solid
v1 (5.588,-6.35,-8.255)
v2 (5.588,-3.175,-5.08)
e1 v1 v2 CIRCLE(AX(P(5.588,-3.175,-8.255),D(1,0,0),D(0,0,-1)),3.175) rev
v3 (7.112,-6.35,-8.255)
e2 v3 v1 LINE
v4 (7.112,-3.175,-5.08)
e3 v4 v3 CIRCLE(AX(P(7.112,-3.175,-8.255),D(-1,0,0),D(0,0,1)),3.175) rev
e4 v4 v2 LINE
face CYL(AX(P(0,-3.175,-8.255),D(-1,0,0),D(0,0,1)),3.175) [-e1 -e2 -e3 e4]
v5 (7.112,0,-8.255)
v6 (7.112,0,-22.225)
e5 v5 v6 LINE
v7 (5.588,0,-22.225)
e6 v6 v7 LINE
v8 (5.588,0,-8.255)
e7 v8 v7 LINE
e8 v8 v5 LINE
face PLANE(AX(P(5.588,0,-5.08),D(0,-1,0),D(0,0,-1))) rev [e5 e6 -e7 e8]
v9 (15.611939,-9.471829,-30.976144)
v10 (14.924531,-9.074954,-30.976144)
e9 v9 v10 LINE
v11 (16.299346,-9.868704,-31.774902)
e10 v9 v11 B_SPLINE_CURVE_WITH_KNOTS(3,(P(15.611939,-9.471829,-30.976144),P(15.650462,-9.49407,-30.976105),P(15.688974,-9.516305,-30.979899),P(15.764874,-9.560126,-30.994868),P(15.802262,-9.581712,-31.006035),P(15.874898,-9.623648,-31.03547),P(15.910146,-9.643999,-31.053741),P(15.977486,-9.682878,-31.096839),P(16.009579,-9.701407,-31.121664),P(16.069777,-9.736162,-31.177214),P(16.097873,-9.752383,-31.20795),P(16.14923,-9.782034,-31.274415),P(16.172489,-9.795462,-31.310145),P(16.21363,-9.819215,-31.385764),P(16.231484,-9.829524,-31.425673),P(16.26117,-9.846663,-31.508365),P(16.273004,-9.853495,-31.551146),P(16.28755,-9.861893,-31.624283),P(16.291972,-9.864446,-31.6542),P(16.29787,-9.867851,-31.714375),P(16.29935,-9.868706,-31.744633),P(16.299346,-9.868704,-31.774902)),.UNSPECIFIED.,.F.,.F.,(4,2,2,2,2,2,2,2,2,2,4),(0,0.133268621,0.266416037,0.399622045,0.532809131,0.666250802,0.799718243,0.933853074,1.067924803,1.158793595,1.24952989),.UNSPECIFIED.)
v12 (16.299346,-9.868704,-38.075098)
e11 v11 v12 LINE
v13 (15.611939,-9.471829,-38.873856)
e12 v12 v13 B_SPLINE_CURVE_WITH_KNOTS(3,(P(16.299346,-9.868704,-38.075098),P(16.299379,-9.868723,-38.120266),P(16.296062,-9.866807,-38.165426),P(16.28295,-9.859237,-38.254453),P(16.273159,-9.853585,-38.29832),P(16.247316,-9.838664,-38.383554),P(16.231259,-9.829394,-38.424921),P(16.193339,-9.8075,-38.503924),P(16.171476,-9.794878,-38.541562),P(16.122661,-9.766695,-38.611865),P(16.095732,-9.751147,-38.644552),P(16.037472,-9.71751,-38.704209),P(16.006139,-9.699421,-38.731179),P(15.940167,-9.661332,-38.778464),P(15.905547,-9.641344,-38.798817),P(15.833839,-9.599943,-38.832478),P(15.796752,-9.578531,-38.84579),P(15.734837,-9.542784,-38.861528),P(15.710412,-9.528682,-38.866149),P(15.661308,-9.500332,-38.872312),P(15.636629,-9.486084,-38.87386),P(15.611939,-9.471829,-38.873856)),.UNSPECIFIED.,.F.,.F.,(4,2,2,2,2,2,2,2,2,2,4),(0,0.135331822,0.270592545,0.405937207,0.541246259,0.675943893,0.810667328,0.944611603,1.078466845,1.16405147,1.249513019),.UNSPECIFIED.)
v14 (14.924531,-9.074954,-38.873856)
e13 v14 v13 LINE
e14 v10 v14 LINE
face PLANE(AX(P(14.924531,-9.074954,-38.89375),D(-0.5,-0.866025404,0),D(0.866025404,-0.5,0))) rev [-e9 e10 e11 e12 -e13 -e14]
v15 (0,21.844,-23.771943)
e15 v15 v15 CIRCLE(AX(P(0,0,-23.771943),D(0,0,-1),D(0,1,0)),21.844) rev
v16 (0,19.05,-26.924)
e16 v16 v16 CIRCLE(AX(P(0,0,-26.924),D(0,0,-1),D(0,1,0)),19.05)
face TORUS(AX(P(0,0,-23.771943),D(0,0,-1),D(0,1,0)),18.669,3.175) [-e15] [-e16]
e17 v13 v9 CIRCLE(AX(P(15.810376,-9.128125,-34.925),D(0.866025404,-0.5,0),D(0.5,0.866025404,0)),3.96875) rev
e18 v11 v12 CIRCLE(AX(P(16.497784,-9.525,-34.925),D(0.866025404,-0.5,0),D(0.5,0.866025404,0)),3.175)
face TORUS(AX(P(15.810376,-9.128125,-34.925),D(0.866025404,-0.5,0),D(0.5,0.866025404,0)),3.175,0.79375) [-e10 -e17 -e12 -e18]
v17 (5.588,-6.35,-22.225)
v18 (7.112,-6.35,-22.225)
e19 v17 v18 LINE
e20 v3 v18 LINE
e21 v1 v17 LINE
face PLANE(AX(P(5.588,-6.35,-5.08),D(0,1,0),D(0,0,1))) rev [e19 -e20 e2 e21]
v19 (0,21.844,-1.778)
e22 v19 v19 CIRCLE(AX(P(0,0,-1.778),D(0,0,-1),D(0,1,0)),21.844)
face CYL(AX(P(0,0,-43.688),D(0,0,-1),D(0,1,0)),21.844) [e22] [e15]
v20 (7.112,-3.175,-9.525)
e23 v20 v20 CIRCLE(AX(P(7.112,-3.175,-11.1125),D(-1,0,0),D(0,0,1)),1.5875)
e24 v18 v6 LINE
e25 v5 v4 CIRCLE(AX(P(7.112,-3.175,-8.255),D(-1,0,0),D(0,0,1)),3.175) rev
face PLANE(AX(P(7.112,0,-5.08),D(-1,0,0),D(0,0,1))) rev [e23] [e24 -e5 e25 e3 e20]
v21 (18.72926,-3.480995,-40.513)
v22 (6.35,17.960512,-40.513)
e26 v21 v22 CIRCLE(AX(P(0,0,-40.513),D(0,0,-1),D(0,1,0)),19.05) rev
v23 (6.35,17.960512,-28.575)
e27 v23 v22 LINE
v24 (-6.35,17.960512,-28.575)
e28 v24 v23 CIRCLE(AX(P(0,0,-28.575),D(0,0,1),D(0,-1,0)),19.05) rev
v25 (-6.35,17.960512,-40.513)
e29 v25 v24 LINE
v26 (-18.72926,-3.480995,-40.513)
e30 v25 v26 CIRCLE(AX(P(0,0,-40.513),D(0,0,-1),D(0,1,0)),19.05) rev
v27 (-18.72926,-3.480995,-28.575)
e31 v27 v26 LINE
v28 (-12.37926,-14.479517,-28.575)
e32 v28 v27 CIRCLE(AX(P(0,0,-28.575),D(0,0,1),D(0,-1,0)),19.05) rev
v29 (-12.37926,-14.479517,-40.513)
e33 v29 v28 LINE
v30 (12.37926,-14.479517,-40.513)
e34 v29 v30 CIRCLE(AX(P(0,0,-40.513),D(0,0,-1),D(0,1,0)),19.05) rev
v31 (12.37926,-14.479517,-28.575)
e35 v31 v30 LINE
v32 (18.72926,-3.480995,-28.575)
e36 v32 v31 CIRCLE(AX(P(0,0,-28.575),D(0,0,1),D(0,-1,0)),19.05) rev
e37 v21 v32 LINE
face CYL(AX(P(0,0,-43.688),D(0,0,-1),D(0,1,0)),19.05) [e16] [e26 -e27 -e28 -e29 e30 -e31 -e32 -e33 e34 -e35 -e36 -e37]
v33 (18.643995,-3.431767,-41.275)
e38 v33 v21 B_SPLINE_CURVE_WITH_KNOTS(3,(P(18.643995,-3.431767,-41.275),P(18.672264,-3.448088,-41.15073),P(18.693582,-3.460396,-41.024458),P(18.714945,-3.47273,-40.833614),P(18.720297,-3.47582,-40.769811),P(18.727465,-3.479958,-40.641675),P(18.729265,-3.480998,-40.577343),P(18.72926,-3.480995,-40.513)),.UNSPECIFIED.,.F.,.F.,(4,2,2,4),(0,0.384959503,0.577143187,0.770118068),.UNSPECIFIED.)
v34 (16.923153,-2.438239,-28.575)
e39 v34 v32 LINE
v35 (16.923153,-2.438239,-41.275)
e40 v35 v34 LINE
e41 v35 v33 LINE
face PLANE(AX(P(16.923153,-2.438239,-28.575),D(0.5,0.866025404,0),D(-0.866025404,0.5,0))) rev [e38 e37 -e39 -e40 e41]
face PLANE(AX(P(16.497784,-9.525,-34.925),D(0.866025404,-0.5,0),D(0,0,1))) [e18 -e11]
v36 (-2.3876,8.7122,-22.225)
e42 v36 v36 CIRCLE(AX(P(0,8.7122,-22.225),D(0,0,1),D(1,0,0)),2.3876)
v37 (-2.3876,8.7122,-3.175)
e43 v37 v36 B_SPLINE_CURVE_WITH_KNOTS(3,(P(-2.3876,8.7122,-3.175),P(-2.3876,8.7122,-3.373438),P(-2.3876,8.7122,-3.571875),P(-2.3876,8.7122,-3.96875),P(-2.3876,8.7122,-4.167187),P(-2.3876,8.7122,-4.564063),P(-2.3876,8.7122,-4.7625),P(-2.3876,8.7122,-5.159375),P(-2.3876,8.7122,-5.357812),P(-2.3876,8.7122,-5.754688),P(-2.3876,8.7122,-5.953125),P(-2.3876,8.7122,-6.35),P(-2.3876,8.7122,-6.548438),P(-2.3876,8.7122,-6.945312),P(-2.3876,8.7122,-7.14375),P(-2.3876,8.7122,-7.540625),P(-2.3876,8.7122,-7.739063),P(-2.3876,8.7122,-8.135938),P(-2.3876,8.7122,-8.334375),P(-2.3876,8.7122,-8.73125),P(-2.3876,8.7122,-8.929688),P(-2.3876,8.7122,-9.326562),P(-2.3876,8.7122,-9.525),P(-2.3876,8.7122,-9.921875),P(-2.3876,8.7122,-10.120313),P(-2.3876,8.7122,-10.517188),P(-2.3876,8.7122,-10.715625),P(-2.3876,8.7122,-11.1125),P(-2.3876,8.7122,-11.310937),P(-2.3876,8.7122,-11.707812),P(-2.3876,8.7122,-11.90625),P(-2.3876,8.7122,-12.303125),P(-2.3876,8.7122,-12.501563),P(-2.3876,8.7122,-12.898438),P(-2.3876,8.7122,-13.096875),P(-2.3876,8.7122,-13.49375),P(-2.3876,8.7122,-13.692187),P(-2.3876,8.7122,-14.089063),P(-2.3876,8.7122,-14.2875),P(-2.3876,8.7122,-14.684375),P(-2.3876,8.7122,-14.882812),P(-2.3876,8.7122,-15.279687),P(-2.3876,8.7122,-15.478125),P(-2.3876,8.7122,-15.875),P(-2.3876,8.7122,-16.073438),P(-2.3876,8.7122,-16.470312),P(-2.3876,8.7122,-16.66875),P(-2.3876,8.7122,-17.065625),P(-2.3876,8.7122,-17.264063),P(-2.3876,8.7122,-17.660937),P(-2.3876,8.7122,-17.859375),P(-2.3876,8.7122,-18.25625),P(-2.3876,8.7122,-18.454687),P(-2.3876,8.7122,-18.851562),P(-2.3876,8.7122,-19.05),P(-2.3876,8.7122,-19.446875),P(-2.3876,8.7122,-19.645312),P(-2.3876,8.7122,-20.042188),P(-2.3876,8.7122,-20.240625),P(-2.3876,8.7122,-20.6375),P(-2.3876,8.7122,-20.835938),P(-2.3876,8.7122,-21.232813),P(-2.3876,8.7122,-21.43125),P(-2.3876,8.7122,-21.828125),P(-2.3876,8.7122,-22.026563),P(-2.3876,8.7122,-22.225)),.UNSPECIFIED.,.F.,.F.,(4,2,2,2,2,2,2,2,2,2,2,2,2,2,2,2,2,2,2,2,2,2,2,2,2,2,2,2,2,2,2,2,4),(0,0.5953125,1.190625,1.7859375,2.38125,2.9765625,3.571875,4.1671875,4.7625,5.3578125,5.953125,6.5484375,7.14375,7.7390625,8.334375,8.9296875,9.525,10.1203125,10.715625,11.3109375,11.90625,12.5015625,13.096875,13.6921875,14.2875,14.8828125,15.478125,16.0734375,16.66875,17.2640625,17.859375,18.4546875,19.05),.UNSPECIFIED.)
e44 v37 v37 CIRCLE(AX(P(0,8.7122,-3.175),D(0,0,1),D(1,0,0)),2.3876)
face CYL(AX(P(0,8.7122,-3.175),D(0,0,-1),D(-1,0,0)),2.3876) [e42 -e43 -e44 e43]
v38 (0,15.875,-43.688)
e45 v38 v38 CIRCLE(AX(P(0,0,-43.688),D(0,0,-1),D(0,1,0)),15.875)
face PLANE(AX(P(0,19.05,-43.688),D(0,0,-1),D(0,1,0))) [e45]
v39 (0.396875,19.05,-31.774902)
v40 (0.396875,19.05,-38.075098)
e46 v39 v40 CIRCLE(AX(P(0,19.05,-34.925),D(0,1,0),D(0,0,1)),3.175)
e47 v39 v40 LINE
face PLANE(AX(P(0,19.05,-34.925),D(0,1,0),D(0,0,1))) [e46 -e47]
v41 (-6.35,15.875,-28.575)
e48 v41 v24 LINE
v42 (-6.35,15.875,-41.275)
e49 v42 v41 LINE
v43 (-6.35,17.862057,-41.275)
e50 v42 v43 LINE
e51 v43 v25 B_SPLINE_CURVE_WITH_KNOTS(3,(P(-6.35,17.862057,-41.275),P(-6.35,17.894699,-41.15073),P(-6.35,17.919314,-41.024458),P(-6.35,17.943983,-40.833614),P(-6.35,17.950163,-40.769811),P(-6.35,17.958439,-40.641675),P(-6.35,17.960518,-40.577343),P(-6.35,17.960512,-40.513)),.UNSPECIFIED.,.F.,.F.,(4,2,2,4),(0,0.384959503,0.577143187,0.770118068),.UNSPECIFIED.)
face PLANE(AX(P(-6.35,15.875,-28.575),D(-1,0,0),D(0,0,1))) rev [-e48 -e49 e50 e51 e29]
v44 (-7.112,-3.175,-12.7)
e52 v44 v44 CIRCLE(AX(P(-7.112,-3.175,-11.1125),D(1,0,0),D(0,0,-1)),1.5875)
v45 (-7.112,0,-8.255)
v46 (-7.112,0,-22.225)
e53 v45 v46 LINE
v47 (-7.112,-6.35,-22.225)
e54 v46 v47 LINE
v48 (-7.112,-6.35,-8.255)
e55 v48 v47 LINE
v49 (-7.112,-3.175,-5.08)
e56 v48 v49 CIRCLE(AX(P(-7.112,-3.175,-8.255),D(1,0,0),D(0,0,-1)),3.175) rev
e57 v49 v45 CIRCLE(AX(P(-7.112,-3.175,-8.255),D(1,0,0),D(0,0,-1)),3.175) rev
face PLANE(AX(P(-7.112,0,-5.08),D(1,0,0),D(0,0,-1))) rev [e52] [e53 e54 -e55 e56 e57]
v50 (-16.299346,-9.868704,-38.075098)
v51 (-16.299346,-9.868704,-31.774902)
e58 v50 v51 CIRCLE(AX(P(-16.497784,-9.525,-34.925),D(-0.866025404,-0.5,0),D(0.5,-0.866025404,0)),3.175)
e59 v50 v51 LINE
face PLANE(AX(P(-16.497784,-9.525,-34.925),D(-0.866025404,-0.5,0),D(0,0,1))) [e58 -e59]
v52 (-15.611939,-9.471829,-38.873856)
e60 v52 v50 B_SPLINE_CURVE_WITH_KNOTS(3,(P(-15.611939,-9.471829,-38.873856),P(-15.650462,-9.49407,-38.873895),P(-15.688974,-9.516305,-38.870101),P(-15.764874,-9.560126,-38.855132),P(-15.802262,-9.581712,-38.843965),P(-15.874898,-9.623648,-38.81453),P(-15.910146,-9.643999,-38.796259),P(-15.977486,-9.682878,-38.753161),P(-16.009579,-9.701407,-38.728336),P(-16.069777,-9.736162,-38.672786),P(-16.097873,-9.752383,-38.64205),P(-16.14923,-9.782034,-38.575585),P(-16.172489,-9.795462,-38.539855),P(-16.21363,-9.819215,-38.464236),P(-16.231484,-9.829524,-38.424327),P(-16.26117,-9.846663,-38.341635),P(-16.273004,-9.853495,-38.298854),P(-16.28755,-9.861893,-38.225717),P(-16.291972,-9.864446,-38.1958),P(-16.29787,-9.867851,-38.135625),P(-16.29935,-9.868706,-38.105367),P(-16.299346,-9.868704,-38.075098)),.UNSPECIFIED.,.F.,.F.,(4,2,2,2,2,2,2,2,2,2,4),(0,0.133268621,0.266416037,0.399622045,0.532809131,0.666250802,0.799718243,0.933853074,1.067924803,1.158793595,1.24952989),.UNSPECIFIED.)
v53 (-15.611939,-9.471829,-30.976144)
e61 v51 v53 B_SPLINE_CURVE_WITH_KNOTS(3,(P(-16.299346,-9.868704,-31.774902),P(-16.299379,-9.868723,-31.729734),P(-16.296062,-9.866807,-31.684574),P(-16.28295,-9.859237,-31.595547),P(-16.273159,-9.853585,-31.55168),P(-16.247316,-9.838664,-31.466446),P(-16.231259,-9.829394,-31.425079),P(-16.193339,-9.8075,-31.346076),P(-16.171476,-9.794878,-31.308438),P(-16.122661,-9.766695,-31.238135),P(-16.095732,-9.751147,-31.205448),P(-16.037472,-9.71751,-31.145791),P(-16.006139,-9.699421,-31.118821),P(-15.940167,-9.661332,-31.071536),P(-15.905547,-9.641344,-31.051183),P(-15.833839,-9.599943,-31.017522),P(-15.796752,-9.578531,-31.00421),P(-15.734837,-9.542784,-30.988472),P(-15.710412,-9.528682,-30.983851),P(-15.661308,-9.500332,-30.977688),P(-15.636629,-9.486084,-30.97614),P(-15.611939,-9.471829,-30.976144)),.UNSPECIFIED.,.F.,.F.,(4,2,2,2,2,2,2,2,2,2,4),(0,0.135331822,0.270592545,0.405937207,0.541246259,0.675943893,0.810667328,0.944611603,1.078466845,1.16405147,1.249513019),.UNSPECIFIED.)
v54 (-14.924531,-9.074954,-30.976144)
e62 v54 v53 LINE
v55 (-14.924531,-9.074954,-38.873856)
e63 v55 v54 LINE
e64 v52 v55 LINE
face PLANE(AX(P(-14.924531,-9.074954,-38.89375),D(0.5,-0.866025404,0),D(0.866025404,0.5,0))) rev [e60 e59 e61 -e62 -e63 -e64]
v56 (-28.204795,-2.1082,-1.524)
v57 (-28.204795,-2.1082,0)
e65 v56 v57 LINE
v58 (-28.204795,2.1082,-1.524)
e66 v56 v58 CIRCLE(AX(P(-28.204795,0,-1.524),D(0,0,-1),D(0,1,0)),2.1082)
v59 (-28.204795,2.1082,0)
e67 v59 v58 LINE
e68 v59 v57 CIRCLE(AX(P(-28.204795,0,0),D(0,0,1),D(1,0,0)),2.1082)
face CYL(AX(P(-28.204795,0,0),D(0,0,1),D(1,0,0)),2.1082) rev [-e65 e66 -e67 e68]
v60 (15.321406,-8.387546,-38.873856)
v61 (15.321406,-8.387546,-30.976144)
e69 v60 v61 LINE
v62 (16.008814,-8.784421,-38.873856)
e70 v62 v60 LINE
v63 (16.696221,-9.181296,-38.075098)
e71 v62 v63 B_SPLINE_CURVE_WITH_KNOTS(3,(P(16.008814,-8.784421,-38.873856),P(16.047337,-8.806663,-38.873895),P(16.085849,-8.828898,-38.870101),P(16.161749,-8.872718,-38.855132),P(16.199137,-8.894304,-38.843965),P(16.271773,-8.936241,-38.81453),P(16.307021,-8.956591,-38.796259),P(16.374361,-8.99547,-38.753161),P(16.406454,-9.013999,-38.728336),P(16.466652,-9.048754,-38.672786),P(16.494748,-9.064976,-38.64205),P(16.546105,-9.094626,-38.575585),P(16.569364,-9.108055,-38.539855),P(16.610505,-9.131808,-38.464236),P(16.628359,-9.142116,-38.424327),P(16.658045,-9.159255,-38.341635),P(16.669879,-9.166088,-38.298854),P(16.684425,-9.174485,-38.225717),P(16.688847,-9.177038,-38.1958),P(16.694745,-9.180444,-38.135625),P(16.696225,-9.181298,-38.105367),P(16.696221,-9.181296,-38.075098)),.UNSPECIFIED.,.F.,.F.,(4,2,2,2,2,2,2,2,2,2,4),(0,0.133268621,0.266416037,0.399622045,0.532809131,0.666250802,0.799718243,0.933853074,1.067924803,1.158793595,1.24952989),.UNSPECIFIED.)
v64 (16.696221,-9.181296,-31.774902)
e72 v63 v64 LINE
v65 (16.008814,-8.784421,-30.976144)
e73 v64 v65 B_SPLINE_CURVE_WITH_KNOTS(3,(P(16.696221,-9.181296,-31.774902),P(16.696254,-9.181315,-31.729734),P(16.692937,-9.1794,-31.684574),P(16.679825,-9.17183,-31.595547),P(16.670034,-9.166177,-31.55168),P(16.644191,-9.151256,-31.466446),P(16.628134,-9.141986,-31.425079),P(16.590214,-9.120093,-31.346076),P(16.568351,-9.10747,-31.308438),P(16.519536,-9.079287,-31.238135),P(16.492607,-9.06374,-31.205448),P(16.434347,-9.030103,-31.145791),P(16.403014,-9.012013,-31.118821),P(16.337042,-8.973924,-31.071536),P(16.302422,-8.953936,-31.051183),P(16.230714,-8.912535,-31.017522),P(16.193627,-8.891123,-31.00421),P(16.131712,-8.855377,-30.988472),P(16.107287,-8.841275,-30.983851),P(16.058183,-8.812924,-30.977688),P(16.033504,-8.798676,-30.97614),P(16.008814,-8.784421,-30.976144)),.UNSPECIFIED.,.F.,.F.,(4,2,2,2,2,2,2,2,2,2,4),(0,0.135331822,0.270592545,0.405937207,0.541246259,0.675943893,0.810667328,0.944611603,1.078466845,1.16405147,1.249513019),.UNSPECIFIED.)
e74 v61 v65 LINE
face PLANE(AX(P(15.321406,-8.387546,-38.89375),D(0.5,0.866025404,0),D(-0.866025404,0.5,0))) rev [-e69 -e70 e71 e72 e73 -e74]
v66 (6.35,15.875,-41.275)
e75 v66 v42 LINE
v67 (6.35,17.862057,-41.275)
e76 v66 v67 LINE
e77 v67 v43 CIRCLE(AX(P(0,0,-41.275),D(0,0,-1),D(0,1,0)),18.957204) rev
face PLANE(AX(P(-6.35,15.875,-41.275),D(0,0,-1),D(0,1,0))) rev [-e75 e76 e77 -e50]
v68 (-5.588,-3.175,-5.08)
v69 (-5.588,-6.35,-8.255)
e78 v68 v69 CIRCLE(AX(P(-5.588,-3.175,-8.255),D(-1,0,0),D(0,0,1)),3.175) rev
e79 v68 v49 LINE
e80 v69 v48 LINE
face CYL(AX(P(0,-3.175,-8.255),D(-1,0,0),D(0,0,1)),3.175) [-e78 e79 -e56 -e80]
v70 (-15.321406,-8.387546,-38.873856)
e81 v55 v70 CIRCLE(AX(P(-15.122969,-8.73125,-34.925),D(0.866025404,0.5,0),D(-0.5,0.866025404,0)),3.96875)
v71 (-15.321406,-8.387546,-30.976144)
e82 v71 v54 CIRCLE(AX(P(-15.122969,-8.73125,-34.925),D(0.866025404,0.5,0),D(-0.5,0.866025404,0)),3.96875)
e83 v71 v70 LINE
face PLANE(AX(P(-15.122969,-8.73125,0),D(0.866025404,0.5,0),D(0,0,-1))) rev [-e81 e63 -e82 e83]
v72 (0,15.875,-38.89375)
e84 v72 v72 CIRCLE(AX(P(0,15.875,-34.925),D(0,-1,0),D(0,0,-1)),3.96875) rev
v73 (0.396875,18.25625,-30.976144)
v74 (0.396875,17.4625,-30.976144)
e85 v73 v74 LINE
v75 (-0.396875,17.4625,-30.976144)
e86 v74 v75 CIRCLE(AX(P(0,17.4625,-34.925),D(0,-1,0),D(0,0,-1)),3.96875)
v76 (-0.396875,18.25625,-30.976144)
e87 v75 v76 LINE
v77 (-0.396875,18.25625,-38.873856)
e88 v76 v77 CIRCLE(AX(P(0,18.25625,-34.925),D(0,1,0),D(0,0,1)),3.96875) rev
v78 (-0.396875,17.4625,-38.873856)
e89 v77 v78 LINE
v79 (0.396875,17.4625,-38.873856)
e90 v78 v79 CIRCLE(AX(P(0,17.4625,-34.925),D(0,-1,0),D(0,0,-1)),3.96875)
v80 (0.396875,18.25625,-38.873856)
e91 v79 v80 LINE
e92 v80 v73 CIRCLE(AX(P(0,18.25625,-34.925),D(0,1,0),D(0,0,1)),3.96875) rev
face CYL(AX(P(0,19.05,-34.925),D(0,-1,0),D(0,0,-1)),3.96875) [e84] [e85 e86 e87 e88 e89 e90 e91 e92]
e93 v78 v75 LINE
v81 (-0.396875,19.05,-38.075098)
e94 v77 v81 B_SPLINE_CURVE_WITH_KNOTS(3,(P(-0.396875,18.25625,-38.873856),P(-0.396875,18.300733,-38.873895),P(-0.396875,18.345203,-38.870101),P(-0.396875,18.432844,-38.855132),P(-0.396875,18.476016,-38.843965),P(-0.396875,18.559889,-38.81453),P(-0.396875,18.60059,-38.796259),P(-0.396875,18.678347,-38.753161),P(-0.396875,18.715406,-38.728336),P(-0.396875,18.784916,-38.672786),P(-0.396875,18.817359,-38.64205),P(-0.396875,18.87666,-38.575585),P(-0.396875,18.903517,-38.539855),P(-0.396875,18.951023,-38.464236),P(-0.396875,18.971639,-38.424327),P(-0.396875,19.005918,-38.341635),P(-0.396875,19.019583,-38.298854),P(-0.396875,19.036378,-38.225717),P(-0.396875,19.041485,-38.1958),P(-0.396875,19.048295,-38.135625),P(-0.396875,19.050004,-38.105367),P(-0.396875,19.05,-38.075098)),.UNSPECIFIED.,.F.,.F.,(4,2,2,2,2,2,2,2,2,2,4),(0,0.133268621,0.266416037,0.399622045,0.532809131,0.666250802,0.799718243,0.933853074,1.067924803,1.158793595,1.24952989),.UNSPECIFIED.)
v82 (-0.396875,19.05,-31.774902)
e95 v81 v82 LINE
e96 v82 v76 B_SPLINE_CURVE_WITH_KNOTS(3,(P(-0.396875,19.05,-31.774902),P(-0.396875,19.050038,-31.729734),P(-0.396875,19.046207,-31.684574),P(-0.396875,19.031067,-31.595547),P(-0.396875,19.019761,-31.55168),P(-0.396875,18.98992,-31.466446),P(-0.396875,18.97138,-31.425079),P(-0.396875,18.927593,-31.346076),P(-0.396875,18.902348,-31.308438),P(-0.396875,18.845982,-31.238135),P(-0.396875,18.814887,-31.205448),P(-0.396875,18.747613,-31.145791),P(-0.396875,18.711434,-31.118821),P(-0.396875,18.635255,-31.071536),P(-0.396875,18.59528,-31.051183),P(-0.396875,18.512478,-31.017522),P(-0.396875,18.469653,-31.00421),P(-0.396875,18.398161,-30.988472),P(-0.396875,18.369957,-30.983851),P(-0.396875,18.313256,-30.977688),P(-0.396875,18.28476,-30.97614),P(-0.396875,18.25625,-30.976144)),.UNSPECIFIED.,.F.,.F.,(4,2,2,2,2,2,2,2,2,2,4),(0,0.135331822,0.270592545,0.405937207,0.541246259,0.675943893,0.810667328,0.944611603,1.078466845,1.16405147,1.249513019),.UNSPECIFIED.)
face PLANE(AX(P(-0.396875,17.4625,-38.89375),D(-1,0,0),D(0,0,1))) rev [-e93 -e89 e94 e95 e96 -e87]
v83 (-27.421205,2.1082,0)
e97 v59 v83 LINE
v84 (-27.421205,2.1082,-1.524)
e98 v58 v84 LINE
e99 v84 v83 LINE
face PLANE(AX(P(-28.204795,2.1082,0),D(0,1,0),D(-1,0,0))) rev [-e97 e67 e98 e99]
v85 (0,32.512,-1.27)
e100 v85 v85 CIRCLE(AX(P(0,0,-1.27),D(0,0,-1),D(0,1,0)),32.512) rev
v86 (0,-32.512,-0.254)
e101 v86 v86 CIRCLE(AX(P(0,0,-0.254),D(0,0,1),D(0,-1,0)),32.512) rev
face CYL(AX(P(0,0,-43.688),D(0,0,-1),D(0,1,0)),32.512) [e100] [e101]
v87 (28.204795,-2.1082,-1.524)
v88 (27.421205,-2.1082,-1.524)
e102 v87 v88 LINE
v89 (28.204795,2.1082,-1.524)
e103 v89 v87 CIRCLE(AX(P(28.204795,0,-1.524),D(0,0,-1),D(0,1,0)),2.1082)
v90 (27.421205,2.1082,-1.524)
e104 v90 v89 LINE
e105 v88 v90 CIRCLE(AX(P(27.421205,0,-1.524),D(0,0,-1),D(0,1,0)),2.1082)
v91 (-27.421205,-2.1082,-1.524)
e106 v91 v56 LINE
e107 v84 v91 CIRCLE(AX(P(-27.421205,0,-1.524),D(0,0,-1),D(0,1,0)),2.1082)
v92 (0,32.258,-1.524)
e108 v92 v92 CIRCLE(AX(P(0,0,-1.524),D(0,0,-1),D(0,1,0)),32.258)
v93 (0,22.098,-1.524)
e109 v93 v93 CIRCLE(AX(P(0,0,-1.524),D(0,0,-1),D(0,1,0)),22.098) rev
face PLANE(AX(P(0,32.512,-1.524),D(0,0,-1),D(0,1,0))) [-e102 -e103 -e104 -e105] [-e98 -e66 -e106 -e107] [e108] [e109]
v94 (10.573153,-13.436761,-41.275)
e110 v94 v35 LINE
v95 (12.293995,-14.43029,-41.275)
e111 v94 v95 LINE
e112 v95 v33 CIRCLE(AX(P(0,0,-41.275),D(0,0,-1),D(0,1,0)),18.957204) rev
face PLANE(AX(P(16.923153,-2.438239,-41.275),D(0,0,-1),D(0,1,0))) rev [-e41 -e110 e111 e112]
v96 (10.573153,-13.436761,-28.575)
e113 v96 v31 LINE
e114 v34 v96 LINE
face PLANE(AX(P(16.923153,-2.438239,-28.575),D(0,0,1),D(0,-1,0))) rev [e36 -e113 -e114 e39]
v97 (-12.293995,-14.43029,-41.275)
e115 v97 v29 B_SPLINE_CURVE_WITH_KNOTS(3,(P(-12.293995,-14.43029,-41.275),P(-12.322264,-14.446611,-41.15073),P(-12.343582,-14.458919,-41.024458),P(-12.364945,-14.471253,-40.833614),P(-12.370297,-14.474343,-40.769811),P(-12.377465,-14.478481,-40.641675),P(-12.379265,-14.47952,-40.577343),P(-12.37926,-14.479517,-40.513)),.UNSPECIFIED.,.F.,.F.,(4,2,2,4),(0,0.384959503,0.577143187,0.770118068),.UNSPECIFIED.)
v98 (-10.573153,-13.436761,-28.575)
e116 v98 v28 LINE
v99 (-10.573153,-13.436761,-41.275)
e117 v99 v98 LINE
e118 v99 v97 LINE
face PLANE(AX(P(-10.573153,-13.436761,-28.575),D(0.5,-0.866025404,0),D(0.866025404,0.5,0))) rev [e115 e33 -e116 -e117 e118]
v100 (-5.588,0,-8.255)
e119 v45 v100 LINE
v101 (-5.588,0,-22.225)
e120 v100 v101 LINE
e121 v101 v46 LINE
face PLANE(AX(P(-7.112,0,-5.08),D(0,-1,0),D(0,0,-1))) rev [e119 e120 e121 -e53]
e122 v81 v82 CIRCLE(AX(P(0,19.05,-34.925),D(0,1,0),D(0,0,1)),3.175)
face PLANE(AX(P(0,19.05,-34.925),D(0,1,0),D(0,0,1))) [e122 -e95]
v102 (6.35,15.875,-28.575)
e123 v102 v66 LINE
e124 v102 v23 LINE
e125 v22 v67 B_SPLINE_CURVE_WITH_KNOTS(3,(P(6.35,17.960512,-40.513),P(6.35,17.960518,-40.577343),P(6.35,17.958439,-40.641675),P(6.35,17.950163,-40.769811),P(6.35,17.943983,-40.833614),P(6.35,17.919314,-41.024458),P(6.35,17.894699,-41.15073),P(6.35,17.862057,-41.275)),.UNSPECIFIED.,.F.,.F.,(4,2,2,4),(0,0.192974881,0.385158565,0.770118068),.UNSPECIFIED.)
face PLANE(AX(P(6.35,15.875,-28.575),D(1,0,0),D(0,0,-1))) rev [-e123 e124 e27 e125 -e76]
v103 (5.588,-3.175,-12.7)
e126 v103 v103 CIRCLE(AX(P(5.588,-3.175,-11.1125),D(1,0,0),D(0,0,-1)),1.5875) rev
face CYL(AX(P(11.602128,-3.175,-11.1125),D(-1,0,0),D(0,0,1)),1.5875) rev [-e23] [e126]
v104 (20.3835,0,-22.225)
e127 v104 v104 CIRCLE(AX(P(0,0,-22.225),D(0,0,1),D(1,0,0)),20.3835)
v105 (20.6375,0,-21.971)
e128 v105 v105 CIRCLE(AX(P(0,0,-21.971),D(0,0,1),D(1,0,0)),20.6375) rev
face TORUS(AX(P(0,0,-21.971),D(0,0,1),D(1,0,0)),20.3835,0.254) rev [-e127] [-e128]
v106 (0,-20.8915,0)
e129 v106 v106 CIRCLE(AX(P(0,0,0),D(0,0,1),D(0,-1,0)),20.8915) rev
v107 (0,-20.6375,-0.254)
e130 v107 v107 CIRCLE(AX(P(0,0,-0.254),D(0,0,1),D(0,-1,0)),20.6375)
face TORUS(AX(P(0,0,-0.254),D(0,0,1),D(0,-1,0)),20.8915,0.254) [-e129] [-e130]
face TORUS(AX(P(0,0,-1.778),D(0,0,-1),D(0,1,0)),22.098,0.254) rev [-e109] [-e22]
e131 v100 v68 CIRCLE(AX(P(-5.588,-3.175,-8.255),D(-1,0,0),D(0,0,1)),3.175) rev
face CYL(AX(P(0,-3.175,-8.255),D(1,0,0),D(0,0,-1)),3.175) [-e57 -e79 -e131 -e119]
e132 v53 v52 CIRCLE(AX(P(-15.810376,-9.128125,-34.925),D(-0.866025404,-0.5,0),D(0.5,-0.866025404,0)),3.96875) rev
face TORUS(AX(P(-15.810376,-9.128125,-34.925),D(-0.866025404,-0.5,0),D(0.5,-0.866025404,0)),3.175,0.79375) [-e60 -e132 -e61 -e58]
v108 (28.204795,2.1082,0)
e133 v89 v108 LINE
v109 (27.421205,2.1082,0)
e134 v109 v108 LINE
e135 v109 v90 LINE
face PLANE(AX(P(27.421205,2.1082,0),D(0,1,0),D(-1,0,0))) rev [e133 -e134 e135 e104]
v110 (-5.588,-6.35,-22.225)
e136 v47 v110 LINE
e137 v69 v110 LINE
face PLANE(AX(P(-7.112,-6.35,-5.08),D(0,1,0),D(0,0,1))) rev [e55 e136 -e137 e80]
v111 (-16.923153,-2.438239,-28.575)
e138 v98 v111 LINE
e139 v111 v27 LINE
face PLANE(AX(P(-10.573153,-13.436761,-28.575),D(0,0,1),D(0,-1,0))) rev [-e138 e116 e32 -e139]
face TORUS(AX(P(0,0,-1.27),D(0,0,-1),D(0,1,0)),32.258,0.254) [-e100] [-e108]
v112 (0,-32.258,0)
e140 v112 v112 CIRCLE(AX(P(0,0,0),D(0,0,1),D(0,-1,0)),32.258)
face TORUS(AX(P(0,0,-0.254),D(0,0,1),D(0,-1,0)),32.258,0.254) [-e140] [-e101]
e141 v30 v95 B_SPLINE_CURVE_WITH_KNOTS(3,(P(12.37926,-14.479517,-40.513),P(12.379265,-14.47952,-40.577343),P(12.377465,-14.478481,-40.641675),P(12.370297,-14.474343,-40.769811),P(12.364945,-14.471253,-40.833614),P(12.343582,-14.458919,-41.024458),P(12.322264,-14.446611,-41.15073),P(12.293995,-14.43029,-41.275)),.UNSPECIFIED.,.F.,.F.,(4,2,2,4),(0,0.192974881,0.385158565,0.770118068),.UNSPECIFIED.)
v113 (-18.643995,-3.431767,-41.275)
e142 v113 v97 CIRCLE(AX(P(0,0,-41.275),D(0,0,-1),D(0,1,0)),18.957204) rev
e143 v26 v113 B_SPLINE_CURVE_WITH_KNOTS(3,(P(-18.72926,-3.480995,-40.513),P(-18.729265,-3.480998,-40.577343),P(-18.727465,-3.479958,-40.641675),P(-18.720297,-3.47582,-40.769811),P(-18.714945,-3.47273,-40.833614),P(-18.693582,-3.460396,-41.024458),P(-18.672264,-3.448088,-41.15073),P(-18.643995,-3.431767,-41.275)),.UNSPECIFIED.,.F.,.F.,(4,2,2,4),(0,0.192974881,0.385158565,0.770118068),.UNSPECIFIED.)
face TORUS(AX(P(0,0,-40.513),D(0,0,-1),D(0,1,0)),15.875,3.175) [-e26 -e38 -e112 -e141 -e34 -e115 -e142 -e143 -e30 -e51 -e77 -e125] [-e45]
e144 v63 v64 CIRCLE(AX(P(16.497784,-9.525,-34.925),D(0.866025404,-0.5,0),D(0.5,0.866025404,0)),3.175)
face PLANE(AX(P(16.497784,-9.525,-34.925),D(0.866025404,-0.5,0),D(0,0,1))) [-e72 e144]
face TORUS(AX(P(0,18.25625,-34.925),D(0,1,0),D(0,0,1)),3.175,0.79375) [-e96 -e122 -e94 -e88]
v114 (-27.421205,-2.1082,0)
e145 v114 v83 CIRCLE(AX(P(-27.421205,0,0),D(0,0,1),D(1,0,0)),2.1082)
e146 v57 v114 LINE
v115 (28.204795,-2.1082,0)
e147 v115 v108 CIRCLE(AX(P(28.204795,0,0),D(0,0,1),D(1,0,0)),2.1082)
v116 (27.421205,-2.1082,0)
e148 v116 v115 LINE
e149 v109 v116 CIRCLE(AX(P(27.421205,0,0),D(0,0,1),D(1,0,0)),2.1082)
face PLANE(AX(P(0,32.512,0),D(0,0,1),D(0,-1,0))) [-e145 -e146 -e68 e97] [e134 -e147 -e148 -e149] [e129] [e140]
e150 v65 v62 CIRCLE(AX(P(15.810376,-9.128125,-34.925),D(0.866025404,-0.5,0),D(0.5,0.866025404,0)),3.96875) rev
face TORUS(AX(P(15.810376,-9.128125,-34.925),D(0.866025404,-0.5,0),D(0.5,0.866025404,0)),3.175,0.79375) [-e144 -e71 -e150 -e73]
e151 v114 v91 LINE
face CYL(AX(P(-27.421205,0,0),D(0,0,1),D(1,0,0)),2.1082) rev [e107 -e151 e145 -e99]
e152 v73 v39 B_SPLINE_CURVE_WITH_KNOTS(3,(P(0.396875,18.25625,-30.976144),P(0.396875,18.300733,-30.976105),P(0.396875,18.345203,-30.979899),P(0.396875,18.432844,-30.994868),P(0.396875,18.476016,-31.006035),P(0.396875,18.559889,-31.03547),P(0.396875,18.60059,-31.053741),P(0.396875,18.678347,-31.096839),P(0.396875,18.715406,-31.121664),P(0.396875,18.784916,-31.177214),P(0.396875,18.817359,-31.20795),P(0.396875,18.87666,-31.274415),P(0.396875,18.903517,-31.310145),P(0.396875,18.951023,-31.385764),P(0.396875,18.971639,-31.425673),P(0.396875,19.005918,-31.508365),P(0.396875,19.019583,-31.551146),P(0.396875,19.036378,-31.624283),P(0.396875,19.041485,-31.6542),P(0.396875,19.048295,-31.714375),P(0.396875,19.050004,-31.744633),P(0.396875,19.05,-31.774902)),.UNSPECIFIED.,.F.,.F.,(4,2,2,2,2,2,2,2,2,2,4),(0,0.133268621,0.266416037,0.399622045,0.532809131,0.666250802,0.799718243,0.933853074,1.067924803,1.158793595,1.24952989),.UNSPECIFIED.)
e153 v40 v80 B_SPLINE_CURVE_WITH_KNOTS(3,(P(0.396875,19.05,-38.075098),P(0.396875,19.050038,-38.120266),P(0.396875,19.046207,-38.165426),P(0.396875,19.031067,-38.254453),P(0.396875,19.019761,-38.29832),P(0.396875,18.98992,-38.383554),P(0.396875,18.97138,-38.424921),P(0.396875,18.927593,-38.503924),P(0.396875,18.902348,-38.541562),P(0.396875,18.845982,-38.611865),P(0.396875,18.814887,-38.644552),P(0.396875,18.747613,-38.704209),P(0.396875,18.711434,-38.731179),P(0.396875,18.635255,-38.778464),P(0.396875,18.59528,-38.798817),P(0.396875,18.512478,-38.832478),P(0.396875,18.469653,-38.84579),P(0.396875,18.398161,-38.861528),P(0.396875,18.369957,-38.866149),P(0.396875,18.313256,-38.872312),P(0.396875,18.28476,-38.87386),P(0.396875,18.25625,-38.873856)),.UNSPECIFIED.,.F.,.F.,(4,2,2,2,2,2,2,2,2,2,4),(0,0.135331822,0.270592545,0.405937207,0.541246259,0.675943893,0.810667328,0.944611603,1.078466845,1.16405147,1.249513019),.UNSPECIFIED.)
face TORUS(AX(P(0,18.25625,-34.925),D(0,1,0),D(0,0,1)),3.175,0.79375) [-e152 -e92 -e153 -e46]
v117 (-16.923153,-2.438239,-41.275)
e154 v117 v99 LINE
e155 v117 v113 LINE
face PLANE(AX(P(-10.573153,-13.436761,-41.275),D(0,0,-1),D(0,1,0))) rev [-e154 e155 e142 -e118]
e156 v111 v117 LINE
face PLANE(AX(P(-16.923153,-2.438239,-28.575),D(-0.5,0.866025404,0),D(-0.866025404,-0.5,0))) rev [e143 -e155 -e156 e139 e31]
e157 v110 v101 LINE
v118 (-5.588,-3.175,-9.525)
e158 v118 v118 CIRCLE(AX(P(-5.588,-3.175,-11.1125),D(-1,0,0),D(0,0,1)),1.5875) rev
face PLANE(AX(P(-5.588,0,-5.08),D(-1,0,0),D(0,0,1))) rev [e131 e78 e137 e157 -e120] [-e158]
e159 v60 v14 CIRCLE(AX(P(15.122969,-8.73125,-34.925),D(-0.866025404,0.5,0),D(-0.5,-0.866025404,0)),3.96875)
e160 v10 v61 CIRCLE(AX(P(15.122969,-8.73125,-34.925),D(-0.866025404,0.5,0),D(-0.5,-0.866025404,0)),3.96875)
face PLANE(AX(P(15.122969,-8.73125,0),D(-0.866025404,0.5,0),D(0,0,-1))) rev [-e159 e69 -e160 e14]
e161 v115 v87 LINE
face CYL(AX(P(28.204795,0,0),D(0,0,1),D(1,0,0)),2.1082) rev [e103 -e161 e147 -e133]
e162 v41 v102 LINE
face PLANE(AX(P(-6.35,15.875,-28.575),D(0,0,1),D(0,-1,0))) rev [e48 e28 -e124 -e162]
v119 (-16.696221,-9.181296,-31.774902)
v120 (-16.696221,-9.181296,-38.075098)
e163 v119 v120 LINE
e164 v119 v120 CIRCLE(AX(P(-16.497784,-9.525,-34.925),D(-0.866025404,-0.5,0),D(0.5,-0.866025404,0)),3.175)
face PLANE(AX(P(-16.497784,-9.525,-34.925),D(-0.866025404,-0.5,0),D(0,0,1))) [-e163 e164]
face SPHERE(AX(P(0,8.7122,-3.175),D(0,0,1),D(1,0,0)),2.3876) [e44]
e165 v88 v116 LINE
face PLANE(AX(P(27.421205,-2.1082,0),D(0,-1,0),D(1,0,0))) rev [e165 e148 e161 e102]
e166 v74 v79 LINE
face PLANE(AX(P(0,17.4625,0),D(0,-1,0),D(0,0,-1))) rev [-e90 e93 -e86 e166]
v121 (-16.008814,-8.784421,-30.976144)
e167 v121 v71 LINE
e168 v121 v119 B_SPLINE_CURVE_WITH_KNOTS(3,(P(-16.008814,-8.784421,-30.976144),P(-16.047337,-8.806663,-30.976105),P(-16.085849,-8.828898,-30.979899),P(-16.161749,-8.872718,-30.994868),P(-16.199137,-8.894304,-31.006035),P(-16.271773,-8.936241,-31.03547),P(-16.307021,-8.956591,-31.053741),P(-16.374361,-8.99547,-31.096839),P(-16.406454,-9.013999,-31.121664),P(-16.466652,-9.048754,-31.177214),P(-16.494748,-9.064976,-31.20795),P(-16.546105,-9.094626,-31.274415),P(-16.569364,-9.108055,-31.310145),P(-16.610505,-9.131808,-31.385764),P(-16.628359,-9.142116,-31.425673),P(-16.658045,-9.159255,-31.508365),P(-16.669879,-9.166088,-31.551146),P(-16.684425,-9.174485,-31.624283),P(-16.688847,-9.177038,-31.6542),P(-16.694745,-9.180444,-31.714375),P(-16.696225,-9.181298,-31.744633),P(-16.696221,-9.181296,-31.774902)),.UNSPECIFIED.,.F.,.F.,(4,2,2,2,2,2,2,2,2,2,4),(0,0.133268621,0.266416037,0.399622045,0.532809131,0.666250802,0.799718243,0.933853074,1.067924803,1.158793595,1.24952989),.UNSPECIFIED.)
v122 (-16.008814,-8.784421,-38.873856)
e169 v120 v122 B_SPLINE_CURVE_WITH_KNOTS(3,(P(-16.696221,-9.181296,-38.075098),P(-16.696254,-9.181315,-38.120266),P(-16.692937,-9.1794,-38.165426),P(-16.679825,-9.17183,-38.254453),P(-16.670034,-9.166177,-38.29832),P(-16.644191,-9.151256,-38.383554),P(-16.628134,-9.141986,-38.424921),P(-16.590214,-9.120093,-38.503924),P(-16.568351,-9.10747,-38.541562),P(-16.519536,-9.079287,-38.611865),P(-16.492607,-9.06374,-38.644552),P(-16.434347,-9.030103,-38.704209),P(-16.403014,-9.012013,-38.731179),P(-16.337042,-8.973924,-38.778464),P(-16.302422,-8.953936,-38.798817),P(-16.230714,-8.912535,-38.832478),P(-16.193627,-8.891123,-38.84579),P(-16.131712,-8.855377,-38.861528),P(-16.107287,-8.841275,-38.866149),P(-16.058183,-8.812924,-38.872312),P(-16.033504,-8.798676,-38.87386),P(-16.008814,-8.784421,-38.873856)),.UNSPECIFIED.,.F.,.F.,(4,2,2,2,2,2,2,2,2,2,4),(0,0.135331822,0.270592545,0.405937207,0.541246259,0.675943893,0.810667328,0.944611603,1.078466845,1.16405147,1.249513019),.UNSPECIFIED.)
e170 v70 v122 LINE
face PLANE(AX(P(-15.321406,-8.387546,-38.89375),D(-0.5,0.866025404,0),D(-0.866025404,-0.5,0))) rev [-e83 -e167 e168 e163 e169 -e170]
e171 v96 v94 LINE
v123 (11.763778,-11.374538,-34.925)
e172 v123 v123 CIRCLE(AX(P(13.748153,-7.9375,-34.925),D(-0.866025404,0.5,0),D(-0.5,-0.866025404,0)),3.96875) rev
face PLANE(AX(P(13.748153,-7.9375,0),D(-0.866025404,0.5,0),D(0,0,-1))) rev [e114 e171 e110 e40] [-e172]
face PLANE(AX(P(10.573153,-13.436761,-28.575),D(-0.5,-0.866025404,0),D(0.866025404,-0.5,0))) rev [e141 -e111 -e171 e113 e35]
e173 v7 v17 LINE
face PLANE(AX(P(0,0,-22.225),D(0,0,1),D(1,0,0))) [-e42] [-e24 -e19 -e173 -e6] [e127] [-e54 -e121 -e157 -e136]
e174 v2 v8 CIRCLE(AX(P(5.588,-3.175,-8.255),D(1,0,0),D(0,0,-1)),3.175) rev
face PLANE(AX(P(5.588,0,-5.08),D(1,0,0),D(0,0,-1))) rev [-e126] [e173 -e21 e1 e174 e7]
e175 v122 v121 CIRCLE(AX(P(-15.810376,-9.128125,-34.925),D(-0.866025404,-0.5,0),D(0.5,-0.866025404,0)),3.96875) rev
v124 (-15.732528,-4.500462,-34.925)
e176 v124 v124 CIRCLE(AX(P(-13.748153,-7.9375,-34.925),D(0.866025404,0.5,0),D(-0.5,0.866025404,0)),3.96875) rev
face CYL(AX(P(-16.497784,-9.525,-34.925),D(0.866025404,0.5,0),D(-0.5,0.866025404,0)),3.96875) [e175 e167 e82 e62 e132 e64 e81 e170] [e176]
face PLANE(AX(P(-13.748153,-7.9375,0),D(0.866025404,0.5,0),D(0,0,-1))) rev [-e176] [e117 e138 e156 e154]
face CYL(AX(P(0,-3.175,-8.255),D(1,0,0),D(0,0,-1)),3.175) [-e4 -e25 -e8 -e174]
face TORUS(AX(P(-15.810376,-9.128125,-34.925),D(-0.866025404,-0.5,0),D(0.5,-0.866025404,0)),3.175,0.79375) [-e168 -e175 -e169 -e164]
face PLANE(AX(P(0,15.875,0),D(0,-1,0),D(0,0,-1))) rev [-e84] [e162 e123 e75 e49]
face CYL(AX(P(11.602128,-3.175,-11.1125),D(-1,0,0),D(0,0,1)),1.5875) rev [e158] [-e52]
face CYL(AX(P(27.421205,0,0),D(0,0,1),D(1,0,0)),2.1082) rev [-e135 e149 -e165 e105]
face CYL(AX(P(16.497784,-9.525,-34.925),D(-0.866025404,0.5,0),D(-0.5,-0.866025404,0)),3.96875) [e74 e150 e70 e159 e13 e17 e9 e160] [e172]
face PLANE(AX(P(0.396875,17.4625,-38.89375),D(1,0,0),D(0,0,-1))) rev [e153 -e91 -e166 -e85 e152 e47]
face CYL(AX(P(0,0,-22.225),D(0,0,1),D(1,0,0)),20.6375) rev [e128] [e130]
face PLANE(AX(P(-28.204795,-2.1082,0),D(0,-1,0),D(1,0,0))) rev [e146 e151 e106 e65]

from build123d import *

# Parameters (mm, degrees)
SKETCH9_R                                = 20.6375
SOCKET_RECESS_DEPTH                      = 22.225
SKETCH10_W                               = 1.524
SKETCH10_H                               = 6.35
MAIN_BLADES_DEPTH                        = 17.145
MAIN_BLADE_CROSS_HOLE_REACH              = 69.348
SKETCH15_R                               = 1.5875
SKETCH12_R                               = 2.3876
GROUND_PIN_DEPTH                         = 19.05
F_19_START                               = -1.524
F_19_0_166_DIAMETER_MOUNTING_SLOTS_DEPTH = 1.524
SKETCH16_W                               = 12.7
SKETCH16_H                               = 12.7
TERMINAL_CUT_DEPTH                       = 3.175
SKETCH17_R                               = 3.96875
TERMINAL_SCREW_DEPTH                     = 3.175
SKETCH18_W                               = 0.79375
SKETCH18_H                               = 7.9375
SCREW_SLOT_DEPTH                         = 1.5875
SCREW_FILLET_R                           = 0.79375
TERMINAL_PATTERN_COUNT                   = 3
SCREW_FILLET_OF_TERMINAL_PATTERN_R       = 0.79375
FILLET4_R                                = 3.175
FILLET5_R                                = 3.175
FILLET6_R                                = 0.254


with BuildPart() as part:
    # Sketch1 → Revolve1 (revolve)
    with BuildSketch(Plane(origin=(0, 0, 0), x_dir=(0, 0, -1), z_dir=(1, 0, 0))):
        Polygon((1.524, 32.512), (1.524, 21.844), (26.924, 21.844), (26.924, 19.05), (43.688, 19.05), (43.688, 0), (0, 0), (0, 32.512), align=None)
    revolve(axis=Axis((0, 0, -43.688), (0, 0, 1)))

    # Sketch9 → Socket Recess (cut)
    with BuildSketch(Plane.XY):
        Circle(SKETCH9_R)
    extrude(amount=-SOCKET_RECESS_DEPTH, mode=Mode.SUBTRACT)

    # Sketch10 → Main Blades (add)
    with BuildSketch(Plane.XY.offset(-22.225)):
        with Locations((-6.35, -3.175)):
            Rectangle(SKETCH10_W, SKETCH10_H)
        with Locations((6.35, -3.175)):
            Rectangle(SKETCH10_W, SKETCH10_H)
    extrude(amount=MAIN_BLADES_DEPTH)

    # Main Blade Cross Hole: up to this face of the body (flat: up to its plane)
    main_blade_cross_hole_end = Plane(part.part.faces().sort_by_distance((7.112, -3.175, -13.6525))[0])
    # Sketch15 → Main Blade Cross Hole (cut, up to the picked face)
    with BuildSketch(Plane(origin=(-7.112, 0, 0), x_dir=(0, 0, -1), z_dir=(1, 0, 0)), mode=Mode.PRIVATE) as main_blade_cross_hole_sk1:
        with Locations(Location((11.1125, -3.175, 0), (0, 0, 180))):
            Circle(SKETCH15_R)
    main_blade_cross_hole_tool1 = split(extrude(main_blade_cross_hole_sk1.sketch, amount=MAIN_BLADE_CROSS_HOLE_REACH, mode=Mode.PRIVATE), bisect_by=main_blade_cross_hole_end, keep=Keep.BOTH, mode=Mode.PRIVATE)
    add(main_blade_cross_hole_tool1.solids().sort_by(Axis((-7.112, -3.175, -11.1125), (1, 0, 0)))[0], mode=Mode.SUBTRACT)

    # Sketch12 → Ground Pin (add)
    with BuildSketch(Plane(origin=(-4.243328269, 1.362052024, -22.225), x_dir=(1, 0, 0), z_dir=(0, 0, 1))):
        with Locations(Location((4.243328269, 7.350147976, 0), (0, 0, 180))):
            Circle(SKETCH12_R)
    extrude(amount=GROUND_PIN_DEPTH)

    # Ground Dome: read off the stored shape, not the designer's step
    # Ground Dome outline → Ground Dome (revolve)
    with BuildSketch(Plane.XZ.offset(-8.7122)):
        with BuildLine():
            Line((0, -3.175), (2.3876, -3.175000002))
            ThreePointArc((2.3876, -3.175000002), (1.688288152, -1.48671185), (0, -0.7874))
            Line((0, -0.7874), (0, -3.175))
        make_face()
    revolve(axis=Axis((0, 8.7122, 0), (0, 0, 1)))

    # #19 (0.166) Diameter Mounting Slots: read off the stored shape, not the designer's step
    # #19 (0.166) Diameter Mounting Slots outli → #19 (0.166) Diameter Mounting Slots (cut)
    with BuildSketch(Plane.XY.offset(F_19_START)):
        with BuildLine():
            Line((27.421205, -2.1082), (28.204795, -2.1082))
            ThreePointArc((28.204795, -2.1082), (30.312995, 0), (28.204795, 2.1082))
            Line((28.204795, 2.1082), (27.421205, 2.1082))
            ThreePointArc((27.421205, 2.1082), (25.313005, 0), (27.421205, -2.1082))
        make_face()
        with BuildLine():
            ThreePointArc((-27.421205, -2.1082), (-25.313005, 0), (-27.421205, 2.1082))
            Line((-27.421205, 2.1082), (-28.204795, 2.1082))
            ThreePointArc((-28.204795, 2.1082), (-30.312995, 0), (-28.204795, -2.1082))
            Line((-28.204795, -2.1082), (-27.421205, -2.1082))
        make_face()
    extrude(amount=F_19_0_166_DIAMETER_MOUNTING_SLOTS_DEPTH, mode=Mode.SUBTRACT)

    # Sketch16 → Terminal Cut (cut)
    with BuildSketch(Plane(origin=(0, 19.05, 0), x_dir=(1, 0, 0), z_dir=(0, 1, 0))):
        with Locations((0, 34.925)):
            Rectangle(SKETCH16_W, SKETCH16_H)
    terminal_cut = extrude(amount=-TERMINAL_CUT_DEPTH, mode=Mode.SUBTRACT)

    # Sketch17 → Terminal Screw (add)
    with BuildSketch(Plane(origin=(0, 15.875, 0), x_dir=(-1, 0, 0), z_dir=(0, 1, 0))):
        with Locations(Location((0, -34.925, 0), (0, 0, 270))):
            Circle(SKETCH17_R)
    terminal_screw = extrude(amount=TERMINAL_SCREW_DEPTH)

    # Sketch18 → Screw Slot (cut)
    with BuildSketch(Plane(origin=(0, 19.05, 0), x_dir=(-1, 0, 0), z_dir=(0, 1, 0))):
        with Locations((0, -34.925)):
            Rectangle(SKETCH18_W, SKETCH18_H)
    screw_slot = extrude(amount=-SCREW_SLOT_DEPTH, mode=Mode.SUBTRACT)

    # Screw Fillet
    screw_fillet_edges = [part.edges().sort_by_distance(p)[0] for p in [
        (3.96875, 19.05, -34.925),
        (-3.96875, 19.05, -34.925),
    ]]
    fillet(screw_fillet_edges, radius=SCREW_FILLET_R)

    # Terminal Pattern: Terminal Cut, Terminal Screw, Screw Slot ×3 about axis
    terminal_pattern_axis = Axis((0, 0, 0), (0, 0, 1))
    add([terminal_cut.rotate(terminal_pattern_axis, i * 360 / TERMINAL_PATTERN_COUNT) for i in range(1, TERMINAL_PATTERN_COUNT)], mode=Mode.SUBTRACT)
    add([terminal_screw.rotate(terminal_pattern_axis, i * 360 / TERMINAL_PATTERN_COUNT) for i in range(1, TERMINAL_PATTERN_COUNT)])
    add([screw_slot.rotate(terminal_pattern_axis, i * 360 / TERMINAL_PATTERN_COUNT) for i in range(1, TERMINAL_PATTERN_COUNT)], mode=Mode.SUBTRACT)

    # Screw Fillet of Terminal Pattern
    screw_fillet_of_terminal_pattern_edges = [part.edges().sort_by_distance(p)[0] for p in [
        (-18.482158942, -6.087961679, -34.925),
        (-14.513408942, -12.962038321, -34.925),
        (14.513408942, -12.962038321, -34.925),
        (18.482158942, -6.087961679, -34.925),
    ]]
    fillet(screw_fillet_of_terminal_pattern_edges, radius=SCREW_FILLET_OF_TERMINAL_PATTERN_R)

    # Fillet4
    fillet4_edges = [part.edges().sort_by_distance(p)[0] for p in [
        (-6.35, -6.35, -5.08),
        (-6.35, 0, -5.08),
        (6.35, -6.35, -5.08),
        (6.35, 0, -5.08),
    ]]
    fillet(fillet4_edges, radius=FILLET4_R - 0.0001)  # a hair under: the kernel refuses the full size

    # Fillet5
    # the kernel refuses this fillet: 3.175 mm, written as the material it takes off along each edge
    with BuildSketch(Plane(origin=(0, 0, -43.688), x_dir=(0, 1, 0), z_dir=(1, 0, 0))) as fillet5_piece_1:
        with BuildLine():
            CenterArc((19.05 - FILLET5_R, FILLET5_R), FILLET5_R, 270, 90)
            Line((19.05 - FILLET5_R, 0), (19.05, 0))
            Line((19.05, 0), (19.05, FILLET5_R))
        make_face()
    revolve(axis=Axis((0, 0, -43.688), (0, 0, 1)), mode=Mode.SUBTRACT)
    with BuildSketch(Plane(origin=(0, 0, -26.924), x_dir=(0, 1, 0), z_dir=(1, 0, 0))) as fillet5_piece_2:
        with BuildLine():
            CenterArc((18.669, 3.152057106), FILLET5_R, 276.892102579, 83.107897421)
            Line((19.05, 0), (21.844, 0))
            Line((21.844, 0), (21.844, 3.152057106))
        make_face()
    revolve(axis=Axis((0, 0, -26.924), (0, 0, 1)), mode=Mode.SUBTRACT)

    # Fillet6
    fillet6_edges = [part.edges().sort_by_distance(p)[0] for p in [
        (-20.6375, 0, -22.225),
        (-20.6375, 0, 0),
        (0, -32.512, -1.524),
        (0, -21.844, -1.524),
        (0, -32.512, 0),
    ]]
    fillet(fillet6_edges, radius=FILLET6_R)


solid = part.part
